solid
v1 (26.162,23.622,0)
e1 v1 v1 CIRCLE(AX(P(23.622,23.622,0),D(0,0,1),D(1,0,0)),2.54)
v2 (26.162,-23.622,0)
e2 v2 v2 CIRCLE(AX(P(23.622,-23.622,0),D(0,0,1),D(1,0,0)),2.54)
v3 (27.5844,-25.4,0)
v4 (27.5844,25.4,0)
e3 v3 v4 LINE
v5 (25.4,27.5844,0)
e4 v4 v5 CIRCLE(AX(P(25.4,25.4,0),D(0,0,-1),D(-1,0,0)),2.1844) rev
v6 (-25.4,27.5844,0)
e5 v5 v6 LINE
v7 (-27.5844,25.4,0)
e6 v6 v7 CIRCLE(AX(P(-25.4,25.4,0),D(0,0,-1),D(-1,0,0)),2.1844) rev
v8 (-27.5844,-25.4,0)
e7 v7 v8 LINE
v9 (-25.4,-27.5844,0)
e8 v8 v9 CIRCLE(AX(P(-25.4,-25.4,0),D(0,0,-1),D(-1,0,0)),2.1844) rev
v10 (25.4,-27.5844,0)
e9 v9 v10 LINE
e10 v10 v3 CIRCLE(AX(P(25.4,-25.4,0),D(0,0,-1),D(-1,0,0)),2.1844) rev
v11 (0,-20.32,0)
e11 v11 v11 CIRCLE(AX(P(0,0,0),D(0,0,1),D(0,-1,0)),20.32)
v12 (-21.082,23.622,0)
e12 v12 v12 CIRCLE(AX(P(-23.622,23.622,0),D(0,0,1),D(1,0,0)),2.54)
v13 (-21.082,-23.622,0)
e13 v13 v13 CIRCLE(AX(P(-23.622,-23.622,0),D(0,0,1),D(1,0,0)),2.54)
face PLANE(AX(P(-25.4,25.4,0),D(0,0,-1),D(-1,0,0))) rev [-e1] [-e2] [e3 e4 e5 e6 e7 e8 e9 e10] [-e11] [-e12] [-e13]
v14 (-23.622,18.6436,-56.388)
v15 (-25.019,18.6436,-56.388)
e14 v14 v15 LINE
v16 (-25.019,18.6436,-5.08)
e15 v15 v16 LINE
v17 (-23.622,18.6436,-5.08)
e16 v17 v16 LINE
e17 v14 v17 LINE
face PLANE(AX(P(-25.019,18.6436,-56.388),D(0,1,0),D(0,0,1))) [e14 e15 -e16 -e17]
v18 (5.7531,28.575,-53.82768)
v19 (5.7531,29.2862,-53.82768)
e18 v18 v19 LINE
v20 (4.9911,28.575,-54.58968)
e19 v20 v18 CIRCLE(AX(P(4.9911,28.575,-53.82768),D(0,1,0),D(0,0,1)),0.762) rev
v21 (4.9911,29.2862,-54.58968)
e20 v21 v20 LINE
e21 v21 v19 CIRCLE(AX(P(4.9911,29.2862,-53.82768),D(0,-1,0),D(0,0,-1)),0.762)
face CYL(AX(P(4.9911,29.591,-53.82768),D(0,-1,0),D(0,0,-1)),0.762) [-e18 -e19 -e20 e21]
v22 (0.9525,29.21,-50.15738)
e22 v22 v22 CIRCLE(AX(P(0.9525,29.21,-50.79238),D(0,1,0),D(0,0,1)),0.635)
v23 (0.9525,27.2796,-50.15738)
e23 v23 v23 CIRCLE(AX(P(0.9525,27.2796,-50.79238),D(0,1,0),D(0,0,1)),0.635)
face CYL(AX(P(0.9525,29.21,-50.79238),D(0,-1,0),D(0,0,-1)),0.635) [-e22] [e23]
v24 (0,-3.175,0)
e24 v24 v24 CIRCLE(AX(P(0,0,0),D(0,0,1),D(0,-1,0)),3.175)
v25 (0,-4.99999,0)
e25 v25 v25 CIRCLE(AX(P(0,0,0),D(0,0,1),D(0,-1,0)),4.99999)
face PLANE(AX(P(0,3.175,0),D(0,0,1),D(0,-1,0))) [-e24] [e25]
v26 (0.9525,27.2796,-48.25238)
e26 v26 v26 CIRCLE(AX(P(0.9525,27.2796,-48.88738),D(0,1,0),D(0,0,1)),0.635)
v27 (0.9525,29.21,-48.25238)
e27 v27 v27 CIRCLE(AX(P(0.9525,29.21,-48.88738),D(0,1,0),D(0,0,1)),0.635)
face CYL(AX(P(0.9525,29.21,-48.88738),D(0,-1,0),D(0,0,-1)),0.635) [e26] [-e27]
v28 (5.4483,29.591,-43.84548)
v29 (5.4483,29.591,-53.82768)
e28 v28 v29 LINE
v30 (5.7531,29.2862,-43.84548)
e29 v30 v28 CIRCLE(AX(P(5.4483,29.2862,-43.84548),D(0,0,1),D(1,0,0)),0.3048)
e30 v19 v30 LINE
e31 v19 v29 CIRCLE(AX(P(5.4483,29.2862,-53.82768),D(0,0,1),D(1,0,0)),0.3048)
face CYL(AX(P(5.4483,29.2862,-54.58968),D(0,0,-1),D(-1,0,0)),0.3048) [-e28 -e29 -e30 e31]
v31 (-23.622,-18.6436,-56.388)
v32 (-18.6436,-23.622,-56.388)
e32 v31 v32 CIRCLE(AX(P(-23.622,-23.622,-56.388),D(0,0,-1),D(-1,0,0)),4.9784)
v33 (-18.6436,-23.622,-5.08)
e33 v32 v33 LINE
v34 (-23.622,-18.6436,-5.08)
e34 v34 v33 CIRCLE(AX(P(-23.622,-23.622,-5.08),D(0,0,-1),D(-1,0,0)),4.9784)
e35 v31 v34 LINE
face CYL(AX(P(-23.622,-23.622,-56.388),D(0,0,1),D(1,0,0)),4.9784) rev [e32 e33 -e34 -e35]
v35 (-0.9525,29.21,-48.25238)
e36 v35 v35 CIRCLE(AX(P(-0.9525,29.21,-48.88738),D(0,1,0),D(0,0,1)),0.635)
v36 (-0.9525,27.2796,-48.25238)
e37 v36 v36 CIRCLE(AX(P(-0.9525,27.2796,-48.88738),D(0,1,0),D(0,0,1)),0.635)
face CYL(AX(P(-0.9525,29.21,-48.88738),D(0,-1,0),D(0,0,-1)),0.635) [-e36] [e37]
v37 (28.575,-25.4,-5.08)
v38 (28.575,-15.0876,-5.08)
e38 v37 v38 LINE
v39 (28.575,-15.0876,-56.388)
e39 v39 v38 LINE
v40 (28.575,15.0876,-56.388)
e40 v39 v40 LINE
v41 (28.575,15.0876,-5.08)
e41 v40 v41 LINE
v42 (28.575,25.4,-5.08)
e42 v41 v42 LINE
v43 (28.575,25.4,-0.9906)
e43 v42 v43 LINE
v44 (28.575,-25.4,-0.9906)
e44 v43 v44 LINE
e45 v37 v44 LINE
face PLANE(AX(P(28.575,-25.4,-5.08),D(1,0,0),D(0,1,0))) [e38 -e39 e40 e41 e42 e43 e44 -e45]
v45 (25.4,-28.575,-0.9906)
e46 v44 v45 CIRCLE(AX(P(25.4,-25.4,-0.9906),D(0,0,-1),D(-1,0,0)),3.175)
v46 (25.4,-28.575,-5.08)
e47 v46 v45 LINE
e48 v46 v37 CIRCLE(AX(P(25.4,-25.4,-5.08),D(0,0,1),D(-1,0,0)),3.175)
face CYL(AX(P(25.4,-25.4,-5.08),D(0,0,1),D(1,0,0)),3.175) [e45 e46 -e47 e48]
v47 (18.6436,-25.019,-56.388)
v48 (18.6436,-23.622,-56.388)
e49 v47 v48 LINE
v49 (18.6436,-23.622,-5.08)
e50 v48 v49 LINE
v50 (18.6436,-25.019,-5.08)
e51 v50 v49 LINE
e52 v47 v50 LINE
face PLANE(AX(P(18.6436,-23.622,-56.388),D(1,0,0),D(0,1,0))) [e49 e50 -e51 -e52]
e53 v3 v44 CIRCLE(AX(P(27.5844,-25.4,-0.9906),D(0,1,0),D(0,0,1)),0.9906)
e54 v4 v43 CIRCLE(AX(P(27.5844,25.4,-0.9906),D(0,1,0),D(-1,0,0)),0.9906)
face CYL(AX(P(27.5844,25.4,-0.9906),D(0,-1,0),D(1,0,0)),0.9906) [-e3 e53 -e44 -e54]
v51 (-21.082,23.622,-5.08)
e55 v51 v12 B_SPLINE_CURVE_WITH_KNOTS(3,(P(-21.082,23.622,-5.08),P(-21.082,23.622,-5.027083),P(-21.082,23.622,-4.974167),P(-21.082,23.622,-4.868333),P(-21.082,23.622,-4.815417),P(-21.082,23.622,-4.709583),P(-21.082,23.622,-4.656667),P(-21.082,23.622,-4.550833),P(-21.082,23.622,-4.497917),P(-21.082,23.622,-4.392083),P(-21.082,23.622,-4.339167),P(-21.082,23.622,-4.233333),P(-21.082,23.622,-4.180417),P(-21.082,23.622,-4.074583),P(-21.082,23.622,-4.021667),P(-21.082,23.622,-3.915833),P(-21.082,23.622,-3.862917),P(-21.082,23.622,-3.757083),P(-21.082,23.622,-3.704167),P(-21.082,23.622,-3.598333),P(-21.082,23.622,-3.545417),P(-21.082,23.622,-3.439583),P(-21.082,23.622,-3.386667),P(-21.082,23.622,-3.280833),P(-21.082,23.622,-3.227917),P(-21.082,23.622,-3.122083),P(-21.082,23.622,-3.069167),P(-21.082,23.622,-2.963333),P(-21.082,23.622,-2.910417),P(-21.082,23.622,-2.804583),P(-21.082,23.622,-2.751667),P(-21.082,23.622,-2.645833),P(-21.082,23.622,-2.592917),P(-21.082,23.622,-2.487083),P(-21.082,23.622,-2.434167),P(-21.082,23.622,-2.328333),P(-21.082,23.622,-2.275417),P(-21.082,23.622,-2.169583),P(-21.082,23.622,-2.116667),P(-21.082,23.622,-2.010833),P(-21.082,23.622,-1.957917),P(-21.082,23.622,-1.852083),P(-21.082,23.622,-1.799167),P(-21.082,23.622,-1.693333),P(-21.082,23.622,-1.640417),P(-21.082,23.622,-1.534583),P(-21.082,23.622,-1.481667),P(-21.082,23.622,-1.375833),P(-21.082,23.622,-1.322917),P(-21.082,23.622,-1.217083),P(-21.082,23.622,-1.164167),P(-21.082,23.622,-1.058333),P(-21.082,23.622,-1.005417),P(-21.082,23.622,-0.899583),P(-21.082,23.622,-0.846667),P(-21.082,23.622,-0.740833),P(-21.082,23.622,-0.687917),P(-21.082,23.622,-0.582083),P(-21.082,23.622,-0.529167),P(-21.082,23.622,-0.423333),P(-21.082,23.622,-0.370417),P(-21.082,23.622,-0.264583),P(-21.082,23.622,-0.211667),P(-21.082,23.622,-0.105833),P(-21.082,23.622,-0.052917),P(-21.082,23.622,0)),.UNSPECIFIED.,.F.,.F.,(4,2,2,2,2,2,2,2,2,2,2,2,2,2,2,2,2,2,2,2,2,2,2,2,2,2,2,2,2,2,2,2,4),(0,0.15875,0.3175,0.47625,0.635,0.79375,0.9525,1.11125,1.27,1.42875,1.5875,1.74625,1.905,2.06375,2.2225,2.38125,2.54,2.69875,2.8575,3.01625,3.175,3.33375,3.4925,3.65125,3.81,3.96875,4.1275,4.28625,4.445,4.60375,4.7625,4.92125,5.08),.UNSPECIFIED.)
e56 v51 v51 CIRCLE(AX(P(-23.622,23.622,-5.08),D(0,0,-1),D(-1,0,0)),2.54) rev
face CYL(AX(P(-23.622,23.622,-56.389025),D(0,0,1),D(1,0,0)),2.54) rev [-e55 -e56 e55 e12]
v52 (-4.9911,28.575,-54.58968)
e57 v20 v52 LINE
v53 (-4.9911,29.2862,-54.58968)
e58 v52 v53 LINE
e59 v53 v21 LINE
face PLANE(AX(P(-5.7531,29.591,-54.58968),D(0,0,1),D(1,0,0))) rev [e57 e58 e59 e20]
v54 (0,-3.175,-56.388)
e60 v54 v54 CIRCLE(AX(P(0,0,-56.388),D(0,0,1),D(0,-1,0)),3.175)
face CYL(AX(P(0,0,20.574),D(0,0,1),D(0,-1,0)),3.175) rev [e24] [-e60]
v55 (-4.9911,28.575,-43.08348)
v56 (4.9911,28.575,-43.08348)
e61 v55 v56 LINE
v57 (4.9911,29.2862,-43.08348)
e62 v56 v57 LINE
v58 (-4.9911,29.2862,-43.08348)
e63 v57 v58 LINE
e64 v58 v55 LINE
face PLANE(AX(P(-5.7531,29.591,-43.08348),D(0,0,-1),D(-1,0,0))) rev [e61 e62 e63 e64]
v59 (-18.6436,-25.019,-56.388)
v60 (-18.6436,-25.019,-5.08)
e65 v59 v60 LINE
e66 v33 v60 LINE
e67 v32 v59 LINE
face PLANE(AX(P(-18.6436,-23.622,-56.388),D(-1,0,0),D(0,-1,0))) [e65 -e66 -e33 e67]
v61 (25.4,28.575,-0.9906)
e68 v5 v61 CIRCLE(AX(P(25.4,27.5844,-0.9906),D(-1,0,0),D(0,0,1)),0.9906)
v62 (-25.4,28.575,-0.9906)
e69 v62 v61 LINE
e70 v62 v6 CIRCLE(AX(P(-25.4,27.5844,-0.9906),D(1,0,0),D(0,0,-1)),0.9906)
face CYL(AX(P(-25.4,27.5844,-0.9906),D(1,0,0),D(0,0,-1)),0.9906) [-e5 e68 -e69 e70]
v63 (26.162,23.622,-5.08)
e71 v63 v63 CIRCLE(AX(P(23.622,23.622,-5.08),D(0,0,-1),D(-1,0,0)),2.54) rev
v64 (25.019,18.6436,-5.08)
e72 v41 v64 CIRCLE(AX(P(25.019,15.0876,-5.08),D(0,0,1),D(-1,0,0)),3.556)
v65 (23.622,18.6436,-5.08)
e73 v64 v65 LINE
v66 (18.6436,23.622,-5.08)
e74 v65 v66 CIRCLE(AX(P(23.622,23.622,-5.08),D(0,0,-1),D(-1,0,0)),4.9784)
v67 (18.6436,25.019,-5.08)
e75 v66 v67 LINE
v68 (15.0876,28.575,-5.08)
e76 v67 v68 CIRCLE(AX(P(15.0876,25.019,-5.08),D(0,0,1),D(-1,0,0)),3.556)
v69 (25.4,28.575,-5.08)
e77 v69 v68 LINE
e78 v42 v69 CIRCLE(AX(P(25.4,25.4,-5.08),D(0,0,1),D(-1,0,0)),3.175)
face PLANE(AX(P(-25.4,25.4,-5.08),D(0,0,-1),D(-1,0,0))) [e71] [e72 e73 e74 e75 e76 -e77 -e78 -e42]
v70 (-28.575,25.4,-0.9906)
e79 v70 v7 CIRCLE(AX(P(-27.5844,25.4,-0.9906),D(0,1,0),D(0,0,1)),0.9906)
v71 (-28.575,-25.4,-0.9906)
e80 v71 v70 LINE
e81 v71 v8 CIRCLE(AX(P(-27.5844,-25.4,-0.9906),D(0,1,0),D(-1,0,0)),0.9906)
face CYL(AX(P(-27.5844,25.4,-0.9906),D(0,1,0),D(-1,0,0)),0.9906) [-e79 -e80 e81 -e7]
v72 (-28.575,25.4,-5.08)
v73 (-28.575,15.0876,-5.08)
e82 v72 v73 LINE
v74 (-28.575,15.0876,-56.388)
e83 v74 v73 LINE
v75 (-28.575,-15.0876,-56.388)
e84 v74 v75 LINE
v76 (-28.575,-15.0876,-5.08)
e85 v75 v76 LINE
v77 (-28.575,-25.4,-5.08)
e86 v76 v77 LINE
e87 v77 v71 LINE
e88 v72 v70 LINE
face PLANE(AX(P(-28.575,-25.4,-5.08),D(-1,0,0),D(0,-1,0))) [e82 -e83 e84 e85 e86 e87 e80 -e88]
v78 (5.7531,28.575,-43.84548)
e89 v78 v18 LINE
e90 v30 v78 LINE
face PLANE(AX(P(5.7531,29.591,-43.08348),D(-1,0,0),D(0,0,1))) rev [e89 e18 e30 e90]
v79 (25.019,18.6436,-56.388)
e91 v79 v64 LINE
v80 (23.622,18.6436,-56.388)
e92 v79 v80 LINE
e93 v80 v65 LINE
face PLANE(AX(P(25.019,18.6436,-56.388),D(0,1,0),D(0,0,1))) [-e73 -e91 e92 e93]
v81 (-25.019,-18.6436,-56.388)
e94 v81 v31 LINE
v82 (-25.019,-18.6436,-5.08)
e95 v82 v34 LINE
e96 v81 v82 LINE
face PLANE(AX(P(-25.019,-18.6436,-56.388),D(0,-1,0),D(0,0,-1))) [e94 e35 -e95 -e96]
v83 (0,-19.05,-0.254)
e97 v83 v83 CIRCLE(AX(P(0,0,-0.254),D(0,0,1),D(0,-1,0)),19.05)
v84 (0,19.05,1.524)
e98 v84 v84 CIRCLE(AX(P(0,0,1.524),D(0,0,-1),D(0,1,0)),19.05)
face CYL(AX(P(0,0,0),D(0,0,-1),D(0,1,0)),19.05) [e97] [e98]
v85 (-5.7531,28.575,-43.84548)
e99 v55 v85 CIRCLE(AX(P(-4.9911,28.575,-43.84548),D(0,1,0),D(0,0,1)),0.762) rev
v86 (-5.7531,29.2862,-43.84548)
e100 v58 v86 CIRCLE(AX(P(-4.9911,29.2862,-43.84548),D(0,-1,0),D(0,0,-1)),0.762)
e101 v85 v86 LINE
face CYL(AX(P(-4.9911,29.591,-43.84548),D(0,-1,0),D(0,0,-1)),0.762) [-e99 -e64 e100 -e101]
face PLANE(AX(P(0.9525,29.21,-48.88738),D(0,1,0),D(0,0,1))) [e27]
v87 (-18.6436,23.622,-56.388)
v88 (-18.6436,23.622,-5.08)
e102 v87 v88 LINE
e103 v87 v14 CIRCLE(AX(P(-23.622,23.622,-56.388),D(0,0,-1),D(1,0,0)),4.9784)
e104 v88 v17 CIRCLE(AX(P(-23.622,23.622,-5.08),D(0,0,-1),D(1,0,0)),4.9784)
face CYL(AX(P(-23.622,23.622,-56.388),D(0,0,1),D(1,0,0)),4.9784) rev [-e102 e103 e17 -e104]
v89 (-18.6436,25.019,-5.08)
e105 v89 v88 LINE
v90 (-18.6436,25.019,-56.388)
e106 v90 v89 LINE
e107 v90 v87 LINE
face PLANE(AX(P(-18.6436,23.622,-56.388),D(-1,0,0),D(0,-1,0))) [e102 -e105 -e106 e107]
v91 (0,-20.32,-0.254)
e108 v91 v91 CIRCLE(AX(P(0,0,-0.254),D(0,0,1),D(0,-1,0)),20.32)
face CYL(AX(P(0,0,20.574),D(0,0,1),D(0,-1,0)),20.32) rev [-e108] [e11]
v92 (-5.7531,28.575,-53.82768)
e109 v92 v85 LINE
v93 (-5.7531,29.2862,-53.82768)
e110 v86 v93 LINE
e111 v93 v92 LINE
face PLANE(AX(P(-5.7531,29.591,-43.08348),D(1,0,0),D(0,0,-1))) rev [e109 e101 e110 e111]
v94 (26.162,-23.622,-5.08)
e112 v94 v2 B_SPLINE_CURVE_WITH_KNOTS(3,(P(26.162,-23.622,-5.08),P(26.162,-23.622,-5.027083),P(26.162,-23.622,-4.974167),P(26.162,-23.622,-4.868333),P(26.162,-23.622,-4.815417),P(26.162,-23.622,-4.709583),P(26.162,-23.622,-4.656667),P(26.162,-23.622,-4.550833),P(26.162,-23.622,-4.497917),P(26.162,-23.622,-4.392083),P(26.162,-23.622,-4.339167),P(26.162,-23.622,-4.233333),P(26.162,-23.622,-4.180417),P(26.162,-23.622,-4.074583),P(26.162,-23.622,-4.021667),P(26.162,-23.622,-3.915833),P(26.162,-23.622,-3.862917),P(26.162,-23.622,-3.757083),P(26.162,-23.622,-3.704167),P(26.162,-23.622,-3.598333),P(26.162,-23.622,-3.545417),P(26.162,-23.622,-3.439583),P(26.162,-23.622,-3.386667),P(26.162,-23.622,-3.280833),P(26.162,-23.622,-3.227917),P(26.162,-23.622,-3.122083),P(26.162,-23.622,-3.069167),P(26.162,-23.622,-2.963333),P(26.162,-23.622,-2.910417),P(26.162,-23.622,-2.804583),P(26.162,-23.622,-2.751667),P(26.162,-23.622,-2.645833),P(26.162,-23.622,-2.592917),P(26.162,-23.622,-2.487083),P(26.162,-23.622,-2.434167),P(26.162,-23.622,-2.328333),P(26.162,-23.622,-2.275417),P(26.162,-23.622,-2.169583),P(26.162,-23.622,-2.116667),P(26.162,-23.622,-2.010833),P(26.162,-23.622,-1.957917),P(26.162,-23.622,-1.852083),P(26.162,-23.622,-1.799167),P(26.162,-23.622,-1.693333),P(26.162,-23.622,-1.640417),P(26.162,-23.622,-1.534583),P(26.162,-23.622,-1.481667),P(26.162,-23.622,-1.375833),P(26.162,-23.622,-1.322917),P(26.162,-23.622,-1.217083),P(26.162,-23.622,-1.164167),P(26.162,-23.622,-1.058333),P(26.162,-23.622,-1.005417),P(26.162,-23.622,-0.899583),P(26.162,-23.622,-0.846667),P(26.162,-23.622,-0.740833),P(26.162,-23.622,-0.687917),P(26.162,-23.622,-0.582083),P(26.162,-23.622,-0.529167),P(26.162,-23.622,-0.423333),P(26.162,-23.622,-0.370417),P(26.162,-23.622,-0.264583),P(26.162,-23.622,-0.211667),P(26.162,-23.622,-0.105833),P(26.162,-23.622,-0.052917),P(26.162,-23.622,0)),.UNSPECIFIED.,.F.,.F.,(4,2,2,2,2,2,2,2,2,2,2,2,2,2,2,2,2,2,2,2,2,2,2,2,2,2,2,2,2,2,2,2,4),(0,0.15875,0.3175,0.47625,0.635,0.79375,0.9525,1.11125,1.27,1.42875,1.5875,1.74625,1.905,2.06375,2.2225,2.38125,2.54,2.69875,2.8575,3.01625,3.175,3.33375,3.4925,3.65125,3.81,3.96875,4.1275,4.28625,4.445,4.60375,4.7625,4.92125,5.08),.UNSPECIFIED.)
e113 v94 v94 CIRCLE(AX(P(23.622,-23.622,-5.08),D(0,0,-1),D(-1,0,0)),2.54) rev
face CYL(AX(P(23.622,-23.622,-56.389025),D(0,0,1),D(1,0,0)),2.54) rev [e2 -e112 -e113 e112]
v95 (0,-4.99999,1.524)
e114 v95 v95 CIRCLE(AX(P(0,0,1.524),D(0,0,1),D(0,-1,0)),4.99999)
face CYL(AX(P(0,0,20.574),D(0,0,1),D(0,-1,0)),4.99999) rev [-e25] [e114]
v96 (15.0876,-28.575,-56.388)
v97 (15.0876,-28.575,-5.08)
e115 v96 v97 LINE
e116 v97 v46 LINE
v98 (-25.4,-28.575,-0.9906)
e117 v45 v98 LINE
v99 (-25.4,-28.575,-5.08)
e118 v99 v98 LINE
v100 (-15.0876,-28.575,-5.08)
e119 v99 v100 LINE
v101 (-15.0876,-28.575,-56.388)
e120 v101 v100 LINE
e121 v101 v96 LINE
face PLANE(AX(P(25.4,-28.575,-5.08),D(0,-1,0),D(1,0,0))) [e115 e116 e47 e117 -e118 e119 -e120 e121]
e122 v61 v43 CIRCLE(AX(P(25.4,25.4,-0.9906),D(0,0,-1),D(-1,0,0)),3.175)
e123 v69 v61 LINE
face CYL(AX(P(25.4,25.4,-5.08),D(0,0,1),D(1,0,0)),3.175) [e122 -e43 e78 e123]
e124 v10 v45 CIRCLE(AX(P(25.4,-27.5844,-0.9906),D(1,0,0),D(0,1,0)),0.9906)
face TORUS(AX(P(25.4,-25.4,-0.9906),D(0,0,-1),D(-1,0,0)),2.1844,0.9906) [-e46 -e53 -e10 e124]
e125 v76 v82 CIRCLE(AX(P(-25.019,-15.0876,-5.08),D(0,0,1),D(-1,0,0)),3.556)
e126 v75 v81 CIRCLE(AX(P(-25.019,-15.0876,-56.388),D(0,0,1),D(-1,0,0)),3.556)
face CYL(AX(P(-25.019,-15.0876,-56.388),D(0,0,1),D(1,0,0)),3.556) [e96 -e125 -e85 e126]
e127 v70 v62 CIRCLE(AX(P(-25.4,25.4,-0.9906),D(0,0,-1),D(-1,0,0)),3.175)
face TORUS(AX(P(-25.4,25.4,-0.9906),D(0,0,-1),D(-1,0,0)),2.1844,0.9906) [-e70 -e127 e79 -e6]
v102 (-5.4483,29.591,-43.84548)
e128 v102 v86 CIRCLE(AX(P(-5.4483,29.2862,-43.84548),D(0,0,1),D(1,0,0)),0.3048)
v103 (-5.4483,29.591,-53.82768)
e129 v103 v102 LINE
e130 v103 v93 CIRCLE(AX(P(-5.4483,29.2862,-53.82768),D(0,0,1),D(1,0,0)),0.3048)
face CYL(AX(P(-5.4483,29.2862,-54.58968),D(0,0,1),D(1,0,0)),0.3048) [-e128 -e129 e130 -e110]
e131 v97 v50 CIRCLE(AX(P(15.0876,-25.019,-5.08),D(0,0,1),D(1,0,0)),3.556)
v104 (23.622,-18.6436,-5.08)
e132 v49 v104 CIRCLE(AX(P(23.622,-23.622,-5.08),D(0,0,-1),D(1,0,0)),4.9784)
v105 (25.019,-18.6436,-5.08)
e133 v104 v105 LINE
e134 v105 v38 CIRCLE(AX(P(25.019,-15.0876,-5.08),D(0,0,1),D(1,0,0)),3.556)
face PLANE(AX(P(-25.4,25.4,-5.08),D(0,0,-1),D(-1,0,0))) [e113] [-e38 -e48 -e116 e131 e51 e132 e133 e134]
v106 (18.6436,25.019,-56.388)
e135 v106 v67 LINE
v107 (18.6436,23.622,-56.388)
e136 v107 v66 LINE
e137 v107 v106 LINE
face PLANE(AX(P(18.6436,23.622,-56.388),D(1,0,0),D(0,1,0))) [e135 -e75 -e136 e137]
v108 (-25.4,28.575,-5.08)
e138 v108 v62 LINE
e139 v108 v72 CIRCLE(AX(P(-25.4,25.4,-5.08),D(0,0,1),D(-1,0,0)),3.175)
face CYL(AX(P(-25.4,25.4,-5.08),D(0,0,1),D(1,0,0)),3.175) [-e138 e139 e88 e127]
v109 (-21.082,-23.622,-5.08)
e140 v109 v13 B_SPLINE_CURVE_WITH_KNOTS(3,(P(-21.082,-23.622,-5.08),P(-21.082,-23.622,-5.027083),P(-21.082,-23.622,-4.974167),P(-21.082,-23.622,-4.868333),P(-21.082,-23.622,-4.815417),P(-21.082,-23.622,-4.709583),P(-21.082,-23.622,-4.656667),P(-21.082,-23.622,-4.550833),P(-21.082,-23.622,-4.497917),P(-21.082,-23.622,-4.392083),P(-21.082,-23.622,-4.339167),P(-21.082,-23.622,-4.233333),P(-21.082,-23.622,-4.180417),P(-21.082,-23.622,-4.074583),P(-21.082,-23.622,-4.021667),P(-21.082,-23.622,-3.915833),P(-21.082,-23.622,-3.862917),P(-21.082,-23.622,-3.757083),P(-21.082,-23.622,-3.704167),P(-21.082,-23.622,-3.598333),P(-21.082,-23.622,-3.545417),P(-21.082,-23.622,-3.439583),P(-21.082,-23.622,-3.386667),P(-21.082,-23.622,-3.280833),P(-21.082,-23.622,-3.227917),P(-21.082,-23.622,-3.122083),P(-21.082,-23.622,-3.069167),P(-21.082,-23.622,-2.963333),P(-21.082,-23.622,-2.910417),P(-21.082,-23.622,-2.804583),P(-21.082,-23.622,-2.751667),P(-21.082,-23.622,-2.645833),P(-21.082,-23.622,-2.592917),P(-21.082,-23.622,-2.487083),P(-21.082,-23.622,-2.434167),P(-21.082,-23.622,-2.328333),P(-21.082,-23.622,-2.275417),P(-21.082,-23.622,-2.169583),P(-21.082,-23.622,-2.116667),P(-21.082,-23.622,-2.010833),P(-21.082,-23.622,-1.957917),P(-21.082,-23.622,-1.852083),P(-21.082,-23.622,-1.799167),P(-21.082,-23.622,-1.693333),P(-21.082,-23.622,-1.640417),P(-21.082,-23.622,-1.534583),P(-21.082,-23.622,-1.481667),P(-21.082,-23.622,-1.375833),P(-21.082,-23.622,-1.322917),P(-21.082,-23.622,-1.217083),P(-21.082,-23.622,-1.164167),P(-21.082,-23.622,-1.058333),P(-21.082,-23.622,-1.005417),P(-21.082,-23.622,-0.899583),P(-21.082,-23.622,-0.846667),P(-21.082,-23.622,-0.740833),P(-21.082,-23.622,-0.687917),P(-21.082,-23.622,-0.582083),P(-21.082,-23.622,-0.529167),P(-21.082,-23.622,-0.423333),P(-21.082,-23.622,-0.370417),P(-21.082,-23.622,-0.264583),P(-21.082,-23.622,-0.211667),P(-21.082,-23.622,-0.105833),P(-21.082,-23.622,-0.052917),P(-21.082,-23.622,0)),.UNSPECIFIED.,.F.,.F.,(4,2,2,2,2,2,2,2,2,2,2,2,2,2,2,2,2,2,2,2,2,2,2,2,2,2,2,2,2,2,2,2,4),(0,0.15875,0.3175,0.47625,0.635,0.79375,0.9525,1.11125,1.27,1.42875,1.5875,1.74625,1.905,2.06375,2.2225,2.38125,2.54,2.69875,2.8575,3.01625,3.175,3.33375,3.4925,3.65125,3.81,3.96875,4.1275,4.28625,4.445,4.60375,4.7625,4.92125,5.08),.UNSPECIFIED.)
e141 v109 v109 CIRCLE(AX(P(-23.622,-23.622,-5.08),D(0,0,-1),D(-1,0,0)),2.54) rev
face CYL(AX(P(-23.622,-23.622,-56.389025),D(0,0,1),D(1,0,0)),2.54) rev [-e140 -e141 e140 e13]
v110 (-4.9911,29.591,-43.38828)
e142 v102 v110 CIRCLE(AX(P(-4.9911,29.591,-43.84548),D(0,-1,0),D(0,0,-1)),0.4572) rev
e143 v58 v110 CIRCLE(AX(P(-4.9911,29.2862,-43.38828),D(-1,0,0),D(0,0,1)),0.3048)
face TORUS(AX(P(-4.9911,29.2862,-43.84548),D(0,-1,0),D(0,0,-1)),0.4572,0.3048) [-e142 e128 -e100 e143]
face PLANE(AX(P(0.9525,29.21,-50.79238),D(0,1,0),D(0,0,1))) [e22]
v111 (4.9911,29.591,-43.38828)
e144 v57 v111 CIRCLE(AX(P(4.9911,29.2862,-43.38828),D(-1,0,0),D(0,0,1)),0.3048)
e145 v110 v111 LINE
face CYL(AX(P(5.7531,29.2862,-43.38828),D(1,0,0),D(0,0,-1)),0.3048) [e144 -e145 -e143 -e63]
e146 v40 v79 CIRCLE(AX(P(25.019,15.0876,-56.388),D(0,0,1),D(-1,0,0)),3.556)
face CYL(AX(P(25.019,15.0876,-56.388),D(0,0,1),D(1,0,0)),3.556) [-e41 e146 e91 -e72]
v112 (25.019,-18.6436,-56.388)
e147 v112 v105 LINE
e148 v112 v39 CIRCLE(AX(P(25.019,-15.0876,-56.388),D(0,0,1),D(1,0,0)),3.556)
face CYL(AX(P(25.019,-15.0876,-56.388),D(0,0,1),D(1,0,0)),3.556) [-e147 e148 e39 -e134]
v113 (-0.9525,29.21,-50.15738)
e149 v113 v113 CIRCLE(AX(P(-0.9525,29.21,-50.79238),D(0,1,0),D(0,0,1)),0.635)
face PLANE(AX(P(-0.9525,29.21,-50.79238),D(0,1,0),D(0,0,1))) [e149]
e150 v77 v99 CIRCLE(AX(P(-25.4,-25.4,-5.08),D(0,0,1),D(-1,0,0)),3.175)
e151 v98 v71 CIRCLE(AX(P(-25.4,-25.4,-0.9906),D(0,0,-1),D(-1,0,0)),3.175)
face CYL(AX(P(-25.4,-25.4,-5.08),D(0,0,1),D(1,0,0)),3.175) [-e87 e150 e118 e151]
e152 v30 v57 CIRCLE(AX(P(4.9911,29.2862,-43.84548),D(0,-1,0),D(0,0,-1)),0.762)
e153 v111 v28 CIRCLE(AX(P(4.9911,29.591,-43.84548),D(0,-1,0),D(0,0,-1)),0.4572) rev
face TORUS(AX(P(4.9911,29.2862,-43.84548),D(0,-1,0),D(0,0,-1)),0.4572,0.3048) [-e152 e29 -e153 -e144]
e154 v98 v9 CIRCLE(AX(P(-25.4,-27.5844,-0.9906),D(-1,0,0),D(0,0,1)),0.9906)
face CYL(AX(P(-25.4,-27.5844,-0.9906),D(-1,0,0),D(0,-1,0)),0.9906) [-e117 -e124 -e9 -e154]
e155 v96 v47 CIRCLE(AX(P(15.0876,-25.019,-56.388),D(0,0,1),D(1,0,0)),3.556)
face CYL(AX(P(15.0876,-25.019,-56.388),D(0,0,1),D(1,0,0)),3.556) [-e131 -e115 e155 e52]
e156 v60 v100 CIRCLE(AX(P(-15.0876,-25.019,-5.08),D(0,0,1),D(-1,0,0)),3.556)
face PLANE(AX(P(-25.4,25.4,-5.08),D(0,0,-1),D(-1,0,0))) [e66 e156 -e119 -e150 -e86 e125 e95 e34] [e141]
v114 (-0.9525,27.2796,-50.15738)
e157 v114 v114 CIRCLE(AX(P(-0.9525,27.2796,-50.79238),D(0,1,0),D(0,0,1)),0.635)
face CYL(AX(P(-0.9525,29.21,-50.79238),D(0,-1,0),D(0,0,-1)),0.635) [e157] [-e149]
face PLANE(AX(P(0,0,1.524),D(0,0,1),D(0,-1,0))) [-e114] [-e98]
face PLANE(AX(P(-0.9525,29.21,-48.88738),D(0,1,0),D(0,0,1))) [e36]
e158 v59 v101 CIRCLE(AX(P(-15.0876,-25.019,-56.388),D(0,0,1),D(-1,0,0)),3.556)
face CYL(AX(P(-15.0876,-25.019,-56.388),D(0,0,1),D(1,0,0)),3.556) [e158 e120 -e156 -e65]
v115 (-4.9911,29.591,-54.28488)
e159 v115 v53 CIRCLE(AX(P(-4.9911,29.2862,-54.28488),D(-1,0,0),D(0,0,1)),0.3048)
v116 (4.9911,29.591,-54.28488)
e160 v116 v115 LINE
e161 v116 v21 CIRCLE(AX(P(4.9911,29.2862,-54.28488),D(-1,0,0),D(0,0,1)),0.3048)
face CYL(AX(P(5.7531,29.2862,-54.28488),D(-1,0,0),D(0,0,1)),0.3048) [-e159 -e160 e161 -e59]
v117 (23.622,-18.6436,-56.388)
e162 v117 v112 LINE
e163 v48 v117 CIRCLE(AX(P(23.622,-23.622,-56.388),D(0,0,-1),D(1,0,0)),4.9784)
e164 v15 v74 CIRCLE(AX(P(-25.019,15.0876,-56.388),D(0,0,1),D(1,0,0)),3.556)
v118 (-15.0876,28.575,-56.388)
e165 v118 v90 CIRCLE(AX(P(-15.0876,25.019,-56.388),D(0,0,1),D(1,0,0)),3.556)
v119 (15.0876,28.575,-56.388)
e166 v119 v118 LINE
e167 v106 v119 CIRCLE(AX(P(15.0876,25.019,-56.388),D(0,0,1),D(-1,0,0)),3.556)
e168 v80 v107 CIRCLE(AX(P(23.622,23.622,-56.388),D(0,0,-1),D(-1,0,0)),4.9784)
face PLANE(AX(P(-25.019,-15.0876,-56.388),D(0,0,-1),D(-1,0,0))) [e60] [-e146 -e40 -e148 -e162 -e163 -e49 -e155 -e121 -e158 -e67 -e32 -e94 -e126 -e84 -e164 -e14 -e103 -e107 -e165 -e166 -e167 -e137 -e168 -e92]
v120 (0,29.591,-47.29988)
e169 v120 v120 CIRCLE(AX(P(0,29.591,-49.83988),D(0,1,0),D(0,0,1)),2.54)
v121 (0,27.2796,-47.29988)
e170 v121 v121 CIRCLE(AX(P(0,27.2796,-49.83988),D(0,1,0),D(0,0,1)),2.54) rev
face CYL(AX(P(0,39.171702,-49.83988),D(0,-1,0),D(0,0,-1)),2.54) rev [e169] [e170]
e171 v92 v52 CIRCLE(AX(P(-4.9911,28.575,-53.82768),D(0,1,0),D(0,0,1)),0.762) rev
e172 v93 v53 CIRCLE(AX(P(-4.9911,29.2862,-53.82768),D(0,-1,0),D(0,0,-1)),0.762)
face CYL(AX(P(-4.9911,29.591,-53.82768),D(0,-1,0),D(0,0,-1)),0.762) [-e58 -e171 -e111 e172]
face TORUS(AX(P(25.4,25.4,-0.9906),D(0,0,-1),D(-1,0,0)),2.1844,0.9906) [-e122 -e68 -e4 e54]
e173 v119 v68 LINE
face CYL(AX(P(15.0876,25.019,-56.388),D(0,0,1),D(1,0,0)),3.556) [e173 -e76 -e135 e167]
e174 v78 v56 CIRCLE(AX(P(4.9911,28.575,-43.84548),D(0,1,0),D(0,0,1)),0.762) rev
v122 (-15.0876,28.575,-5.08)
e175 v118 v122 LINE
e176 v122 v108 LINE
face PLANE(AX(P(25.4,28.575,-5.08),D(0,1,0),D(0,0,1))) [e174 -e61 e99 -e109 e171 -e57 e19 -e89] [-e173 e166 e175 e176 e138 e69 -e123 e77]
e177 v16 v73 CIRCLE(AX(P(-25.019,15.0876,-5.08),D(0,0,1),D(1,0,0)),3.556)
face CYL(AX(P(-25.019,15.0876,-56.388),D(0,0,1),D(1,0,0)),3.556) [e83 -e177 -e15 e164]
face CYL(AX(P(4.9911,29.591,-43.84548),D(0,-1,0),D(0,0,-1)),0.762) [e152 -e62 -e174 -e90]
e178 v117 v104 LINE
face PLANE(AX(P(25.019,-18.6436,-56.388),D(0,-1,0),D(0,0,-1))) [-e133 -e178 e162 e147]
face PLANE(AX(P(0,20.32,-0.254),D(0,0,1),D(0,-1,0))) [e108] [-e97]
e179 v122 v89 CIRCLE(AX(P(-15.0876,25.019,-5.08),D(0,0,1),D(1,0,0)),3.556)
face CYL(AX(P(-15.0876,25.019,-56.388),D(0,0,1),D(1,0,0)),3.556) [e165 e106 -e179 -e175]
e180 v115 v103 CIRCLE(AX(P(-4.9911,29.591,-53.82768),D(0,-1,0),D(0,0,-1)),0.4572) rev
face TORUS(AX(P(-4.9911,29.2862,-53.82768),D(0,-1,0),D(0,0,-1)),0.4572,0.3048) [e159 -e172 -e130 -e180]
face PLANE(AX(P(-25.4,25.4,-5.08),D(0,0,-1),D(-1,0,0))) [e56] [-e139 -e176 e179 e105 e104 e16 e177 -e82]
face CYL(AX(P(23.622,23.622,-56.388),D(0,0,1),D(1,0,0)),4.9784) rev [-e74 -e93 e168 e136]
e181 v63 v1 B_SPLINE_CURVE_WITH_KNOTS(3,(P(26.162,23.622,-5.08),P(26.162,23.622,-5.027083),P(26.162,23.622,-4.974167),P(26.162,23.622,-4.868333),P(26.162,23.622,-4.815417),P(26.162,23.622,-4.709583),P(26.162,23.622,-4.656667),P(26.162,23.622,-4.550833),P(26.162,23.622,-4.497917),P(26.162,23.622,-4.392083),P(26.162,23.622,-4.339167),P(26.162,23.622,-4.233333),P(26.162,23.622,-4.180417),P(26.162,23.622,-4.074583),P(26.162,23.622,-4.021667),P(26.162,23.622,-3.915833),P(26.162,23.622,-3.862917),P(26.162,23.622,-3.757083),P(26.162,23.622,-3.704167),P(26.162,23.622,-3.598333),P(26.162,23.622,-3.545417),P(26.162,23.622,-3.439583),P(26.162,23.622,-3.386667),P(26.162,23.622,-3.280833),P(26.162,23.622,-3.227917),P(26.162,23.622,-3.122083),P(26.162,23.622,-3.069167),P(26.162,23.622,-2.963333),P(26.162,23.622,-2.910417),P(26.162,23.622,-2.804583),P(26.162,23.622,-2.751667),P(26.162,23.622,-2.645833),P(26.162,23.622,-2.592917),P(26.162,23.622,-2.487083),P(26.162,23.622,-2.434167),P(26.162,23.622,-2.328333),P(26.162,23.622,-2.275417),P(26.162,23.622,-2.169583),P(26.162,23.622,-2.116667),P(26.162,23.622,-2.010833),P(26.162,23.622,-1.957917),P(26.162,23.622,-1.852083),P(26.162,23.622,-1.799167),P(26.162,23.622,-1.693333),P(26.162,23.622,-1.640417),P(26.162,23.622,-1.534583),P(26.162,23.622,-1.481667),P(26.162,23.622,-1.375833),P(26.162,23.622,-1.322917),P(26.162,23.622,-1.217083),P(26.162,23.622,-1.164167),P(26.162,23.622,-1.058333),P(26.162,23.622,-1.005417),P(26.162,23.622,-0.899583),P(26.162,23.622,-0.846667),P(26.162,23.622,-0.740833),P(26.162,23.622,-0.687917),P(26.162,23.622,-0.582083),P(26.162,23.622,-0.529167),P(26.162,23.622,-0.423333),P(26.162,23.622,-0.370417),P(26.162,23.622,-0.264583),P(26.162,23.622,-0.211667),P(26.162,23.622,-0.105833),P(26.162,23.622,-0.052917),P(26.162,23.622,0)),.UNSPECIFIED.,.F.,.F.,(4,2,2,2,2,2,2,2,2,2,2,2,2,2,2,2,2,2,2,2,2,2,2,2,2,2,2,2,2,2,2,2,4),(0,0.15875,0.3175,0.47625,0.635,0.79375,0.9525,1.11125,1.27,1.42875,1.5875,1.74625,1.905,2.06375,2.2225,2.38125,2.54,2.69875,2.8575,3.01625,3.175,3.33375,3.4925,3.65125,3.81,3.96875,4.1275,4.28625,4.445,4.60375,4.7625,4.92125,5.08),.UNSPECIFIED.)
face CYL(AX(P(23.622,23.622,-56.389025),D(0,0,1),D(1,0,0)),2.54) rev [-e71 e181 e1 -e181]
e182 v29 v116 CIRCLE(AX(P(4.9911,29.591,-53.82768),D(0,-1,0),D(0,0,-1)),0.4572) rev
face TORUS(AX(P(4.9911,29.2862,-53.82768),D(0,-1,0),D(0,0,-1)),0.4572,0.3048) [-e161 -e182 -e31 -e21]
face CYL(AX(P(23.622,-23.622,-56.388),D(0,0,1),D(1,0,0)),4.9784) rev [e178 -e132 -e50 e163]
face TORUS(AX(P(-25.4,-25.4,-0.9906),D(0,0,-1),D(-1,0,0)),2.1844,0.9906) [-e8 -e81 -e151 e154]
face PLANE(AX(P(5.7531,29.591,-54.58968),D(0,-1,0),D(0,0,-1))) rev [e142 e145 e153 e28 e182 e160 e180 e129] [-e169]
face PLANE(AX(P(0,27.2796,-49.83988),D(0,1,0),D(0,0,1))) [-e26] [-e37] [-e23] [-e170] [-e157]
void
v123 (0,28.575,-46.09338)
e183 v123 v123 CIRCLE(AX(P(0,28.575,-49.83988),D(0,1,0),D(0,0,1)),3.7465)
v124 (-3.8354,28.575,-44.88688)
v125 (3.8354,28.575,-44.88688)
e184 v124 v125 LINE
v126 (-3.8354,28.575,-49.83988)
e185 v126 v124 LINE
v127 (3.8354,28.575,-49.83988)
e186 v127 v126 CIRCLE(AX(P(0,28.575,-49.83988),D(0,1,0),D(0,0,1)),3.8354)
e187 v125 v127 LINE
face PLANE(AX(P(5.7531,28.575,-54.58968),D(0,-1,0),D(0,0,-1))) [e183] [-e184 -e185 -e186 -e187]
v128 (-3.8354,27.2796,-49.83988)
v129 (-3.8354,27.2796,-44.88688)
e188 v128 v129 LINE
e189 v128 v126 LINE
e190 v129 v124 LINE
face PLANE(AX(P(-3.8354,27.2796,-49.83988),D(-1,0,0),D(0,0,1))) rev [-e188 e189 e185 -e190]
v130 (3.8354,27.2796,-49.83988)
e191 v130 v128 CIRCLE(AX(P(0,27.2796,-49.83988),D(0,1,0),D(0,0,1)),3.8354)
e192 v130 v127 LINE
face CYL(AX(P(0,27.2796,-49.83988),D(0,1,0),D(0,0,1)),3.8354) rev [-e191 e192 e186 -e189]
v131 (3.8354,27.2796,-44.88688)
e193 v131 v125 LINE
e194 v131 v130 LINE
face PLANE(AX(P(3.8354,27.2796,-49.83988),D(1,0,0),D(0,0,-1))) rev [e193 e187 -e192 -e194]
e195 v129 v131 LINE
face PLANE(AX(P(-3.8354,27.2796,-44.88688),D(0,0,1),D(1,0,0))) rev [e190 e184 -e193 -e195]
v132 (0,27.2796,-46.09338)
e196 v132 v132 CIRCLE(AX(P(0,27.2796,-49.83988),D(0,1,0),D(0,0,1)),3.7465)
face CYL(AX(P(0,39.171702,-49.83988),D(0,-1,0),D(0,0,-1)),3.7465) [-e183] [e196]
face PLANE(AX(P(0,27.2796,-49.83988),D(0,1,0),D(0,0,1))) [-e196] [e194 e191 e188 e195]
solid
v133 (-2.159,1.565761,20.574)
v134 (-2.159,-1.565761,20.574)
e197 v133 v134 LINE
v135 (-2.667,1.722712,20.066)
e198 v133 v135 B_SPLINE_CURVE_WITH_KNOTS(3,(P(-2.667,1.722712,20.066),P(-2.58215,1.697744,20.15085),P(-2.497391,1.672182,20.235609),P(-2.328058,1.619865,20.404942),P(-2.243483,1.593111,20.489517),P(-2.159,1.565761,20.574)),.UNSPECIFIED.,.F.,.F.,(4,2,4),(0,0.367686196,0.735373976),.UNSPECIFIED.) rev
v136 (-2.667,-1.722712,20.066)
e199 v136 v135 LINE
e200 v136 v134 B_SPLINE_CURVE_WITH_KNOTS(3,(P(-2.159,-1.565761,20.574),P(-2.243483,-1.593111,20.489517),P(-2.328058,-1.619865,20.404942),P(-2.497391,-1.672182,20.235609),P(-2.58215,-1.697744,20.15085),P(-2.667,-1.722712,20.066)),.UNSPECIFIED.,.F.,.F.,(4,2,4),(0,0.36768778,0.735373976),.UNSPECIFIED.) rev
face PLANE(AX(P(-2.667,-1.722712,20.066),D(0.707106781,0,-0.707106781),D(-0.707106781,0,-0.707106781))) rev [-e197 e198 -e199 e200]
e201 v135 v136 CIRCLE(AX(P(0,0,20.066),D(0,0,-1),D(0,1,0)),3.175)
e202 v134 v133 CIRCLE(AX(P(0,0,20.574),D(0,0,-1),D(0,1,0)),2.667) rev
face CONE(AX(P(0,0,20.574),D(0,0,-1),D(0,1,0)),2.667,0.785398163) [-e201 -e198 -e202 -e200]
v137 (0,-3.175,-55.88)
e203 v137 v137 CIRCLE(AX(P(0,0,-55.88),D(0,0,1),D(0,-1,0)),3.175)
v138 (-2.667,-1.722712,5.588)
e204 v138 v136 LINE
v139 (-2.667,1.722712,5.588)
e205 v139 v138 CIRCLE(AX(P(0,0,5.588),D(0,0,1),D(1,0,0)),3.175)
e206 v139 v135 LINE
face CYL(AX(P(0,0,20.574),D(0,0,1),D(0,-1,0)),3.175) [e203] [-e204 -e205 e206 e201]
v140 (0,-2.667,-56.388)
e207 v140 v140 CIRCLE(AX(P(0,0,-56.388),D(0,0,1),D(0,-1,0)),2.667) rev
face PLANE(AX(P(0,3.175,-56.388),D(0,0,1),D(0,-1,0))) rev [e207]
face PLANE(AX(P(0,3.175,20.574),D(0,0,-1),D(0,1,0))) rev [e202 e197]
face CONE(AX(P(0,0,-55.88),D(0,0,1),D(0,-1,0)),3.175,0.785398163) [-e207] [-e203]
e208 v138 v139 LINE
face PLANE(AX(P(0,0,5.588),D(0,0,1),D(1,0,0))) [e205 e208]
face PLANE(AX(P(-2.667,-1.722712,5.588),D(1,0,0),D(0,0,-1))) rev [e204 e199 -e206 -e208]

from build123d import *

# Parameters (mm, degrees)
BOSS_EXTRUDE1_DEPTH = 5.08
FILLET1_R           = 0.9906
BOSS_EXTRUDE2_DEPTH = 51.308
SKETCH5_W           = 1.524
SKETCH5_H           = 19.05
SKETCH6_W           = 0.254
SKETCH6_H           = 1.27
SKETCH7_W           = 76.962
SKETCH7_H           = 3.175
CUT_EXTRUDE1_START  = -14.986
CUT_EXTRUDE1_DEPTH  = 14.986
CHAMFER1_SIZE       = 0.508
SKETCH9_R           = 2.54
CUT_EXTRUDE2_DEPTH  = 5.08
CUT_EXTRUDE3_DEPTH  = 1.2954
SKETCH11_R          = 3.7465
SKETCH11_R_2        = 2.54
BOSS_EXTRUDE3_DEPTH = 1.2954
SKETCH12_W          = 11.5062
SKETCH12_H          = 11.5062
SKETCH12_R          = 2.54
BOSS_EXTRUDE4_DEPTH = 1.016
FILLET2_R           = 0.762
FILLET3_R           = 0.3048
SKETCH13_R          = 0.635
BOSS_EXTRUDE5_DEPTH = 1.9304


with BuildPart() as part:
    # Sketch3 → Boss-Extrude1 (new body)
    with BuildSketch(Plane.XY):
        with BuildLine():
            Line((-28.575, -25.4), (-28.575, 25.4))
            ThreePointArc((-28.575, 25.4), (-27.64506403, 27.64506403), (-25.4, 28.575))
            Line((-25.4, 28.575), (25.4, 28.575))
            ThreePointArc((25.4, 28.575), (27.64506403, 27.64506403), (28.575, 25.4))
            Line((28.575, 25.4), (28.575, -25.4))
            ThreePointArc((28.575, -25.4), (27.64506403, -27.64506403), (25.4, -28.575))
            Line((25.4, -28.575), (-25.4, -28.575))
            ThreePointArc((-25.4, -28.575), (-27.64506403, -27.64506403), (-28.575, -25.4))
        make_face()
    extrude(amount=-BOSS_EXTRUDE1_DEPTH)

    # Fillet1
    fillet1_edges = [part.edges().sort_by_distance(p)[0] for p in [
        (-28.575, 0, 0),
        (-27.64506403, 27.64506403, 0),
        (0, 28.575, 0),
        (27.64506403, 27.64506403, 0),
        (28.575, 0, 0),
        (27.64506403, -27.64506403, 0),
        (0, -28.575, 0),
        (-27.64506403, -27.64506403, 0),
    ]]
    fillet(fillet1_edges, radius=FILLET1_R)

    # Sketch4 → Boss-Extrude2 (add)
    with BuildSketch(Plane.XY.offset(-5.08)):
        with BuildLine():
            Line((-25.019, 18.6436), (-23.622, 18.6436))
            ThreePointArc((-23.622, 18.6436), (-20.101739601, 20.101739601), (-18.6436, 23.622))
            Line((-18.6436, 23.622), (-18.6436, 25.019))
            ThreePointArc((-18.6436, 25.019), (-17.602071714, 27.533471714), (-15.0876, 28.575))
            Line((-15.0876, 28.575), (15.0876, 28.575))
            ThreePointArc((15.0876, 28.575), (17.602071714, 27.533471714), (18.6436, 25.019))
            Line((18.6436, 25.019), (18.6436, 23.622))
            ThreePointArc((18.6436, 23.622), (20.101739601, 20.101739601), (23.622, 18.6436))
            Line((23.622, 18.6436), (25.019, 18.6436))
            ThreePointArc((25.019, 18.6436), (27.533471714, 17.602071714), (28.575, 15.0876))
            Line((28.575, 15.0876), (28.575, -15.0876))
            ThreePointArc((28.575, -15.0876), (27.533471714, -17.602071714), (25.019, -18.6436))
            Line((25.019, -18.6436), (23.622, -18.6436))
            ThreePointArc((23.622, -18.6436), (20.101739601, -20.101739601), (18.6436, -23.622))
            Line((18.6436, -23.622), (18.6436, -25.019))
            ThreePointArc((18.6436, -25.019), (17.602071714, -27.533471714), (15.0876, -28.575))
            Line((15.0876, -28.575), (-15.0876, -28.575))
            ThreePointArc((-15.0876, -28.575), (-17.602071714, -27.533471714), (-18.6436, -25.019))
            Line((-18.6436, -25.019), (-18.6436, -23.622))
            ThreePointArc((-18.6436, -23.622), (-20.101739601, -20.101739601), (-23.622, -18.6436))
            Line((-23.622, -18.6436), (-25.019, -18.6436))
            ThreePointArc((-25.019, -18.6436), (-27.533471714, -17.602071714), (-28.575, -15.0876))
            Line((-28.575, -15.0876), (-28.575, 15.0876))
            ThreePointArc((-28.575, 15.0876), (-27.533471714, 17.602071714), (-25.019, 18.6436))
        make_face()
    extrude(amount=-BOSS_EXTRUDE2_DEPTH)

    # Sketch5 → Revolve1 (revolve)
    with BuildSketch(Plane(origin=(0, 0, 0), x_dir=(0, 0, -1), z_dir=(1, 0, 0))):
        with Locations((-0.762, 9.525)):
            Rectangle(SKETCH5_W, SKETCH5_H)
    revolve(axis=Axis((0, 0, 0), (0, 0, 1)))

    # Sketch6 → Cut-Revolve1 (revolve, cut)
    with BuildSketch(Plane(origin=(0, 0, 0), x_dir=(0, 0, -1), z_dir=(1, 0, 0)), mode=Mode.PRIVATE) as cut_revolve1_sk:
        Polygon((56.388, 0), (-1.524, 0), (-1.524, 4.99999), (0, 4.99999), (0, 3.175), (56.388, 3.175), align=None)
        with Locations((0.127, 19.685)):
            Rectangle(SKETCH6_W, SKETCH6_H)
    revolve(cut_revolve1_sk.sketch.rotate(Axis((0, 0, 20.574), (0, 0, -1)), 180), axis=Axis((0, 0, 20.574), (0, 0, -1)), mode=Mode.SUBTRACT)

    # Sketch9 → Cut-Extrude2 (cut)
    with BuildSketch(Plane.XY):
        with Locations((23.622, -23.622)):
            Circle(SKETCH9_R)
        with Locations((-23.622, -23.622)):
            Circle(SKETCH9_R)
        with Locations((-23.622, 23.622)):
            Circle(SKETCH9_R)
        with Locations((23.622, 23.622)):
            Circle(SKETCH9_R)
    extrude(amount=-CUT_EXTRUDE2_DEPTH, mode=Mode.SUBTRACT)

    # Sketch10 → Cut-Extrude3 (cut)
    with BuildSketch(Plane(origin=(0, 28.575, -0.751200197), x_dir=(1, 0, 0), z_dir=(0, 1, 0))):
        with BuildLine():
            Line((-3.8354, 49.088679803), (-3.8354, 44.135679803))
            Line((-3.8354, 44.135679803), (3.8354, 44.135679803))
            Line((3.8354, 44.135679803), (3.8354, 49.088679803))
            ThreePointArc((3.8354, 49.088679803), (0, 52.924079803), (-3.8354, 49.088679803))
        make_face()
    extrude(amount=-CUT_EXTRUDE3_DEPTH, mode=Mode.SUBTRACT)

    # Sketch11 → Boss-Extrude3 (add)
    with BuildSketch(Plane(origin=(0, 27.2796, 0), x_dir=(1, 0, 0), z_dir=(0, 1, 0))):
        with Locations(Location((0, 49.83988, 0), (0, 0, 270))):
            Circle(SKETCH11_R)
        with Locations(Location((0, 49.83988, 0), (0, 0, 270))):
            Circle(SKETCH11_R_2, mode=Mode.SUBTRACT)
    extrude(amount=BOSS_EXTRUDE3_DEPTH)

    # Sketch12 → Boss-Extrude4 (add)
    with BuildSketch(Plane(origin=(0, 28.575, 0), x_dir=(1, 0, 0), z_dir=(0, 1, 0))):
        with Locations((0, 48.83658)):
            Rectangle(SKETCH12_W, SKETCH12_H)
        with Locations(Location((0, 49.83988, 0), (0, 0, 270))):
            Circle(SKETCH12_R, mode=Mode.SUBTRACT)
    extrude(amount=BOSS_EXTRUDE4_DEPTH)

    # Fillet2
    fillet2_edges = [part.edges().sort_by_distance(p)[0] for p in [
        (5.7531, 29.083, -43.08348),
        (5.7531, 29.083, -54.58968),
        (-5.7531, 29.083, -54.58968),
        (-5.7531, 29.083, -43.08348),
    ]]
    fillet(fillet2_edges, radius=FILLET2_R)

    # Fillet3
    fillet3_edges = [part.edges().sort_by_distance(p)[0] for p in [
        (0, 29.591, -54.58968),
        (5.7531, 29.591, -48.83658),
        (-5.7531, 29.591, -48.83658),
        (0, 29.591, -43.08348),
        (-5.529915367, 29.591, -43.306664633),
        (5.529915367, 29.591, -43.306664633),
        (-5.529915367, 29.591, -54.366495367),
        (5.529915367, 29.591, -54.366495367),
    ]]
    fillet(fillet3_edges, radius=FILLET3_R)

    # Sketch13 → Boss-Extrude5 (add)
    with BuildSketch(Plane(origin=(0, 27.2796, 0), x_dir=(1, 0, 0), z_dir=(0, 1, 0))):
        with Locations(Location((-0.9525, 50.79238, 0), (0, 0, 270))):
            Circle(SKETCH13_R)
        with Locations(Location((0.9525, 50.79238, 0), (0, 0, 270))):
            Circle(SKETCH13_R)
        with Locations(Location((0.9525, 48.88738, 0), (0, 0, 270))):
            Circle(SKETCH13_R)
        with Locations(Location((-0.9525, 48.88738, 0), (0, 0, 270))):
            Circle(SKETCH13_R)
    extrude(amount=BOSS_EXTRUDE5_DEPTH)


with BuildPart() as body_2:
    # Sketch7 → Revolve2 (revolve)
    with BuildSketch(Plane(origin=(0, 0, 0), x_dir=(0, 0, -1), z_dir=(1, 0, 0)), mode=Mode.PRIVATE) as revolve2_sk:
        with Locations((17.907, 1.5875)):
            Rectangle(SKETCH7_W, SKETCH7_H)
    revolve(revolve2_sk.sketch.rotate(Axis((0, 0, 20.574), (0, 0, -1)), 180), axis=Axis((0, 0, 20.574), (0, 0, -1)))

    # Sketch8 → Cut-Extrude1 (cut)
    with BuildSketch(Plane.XY.offset(20.574).offset(CUT_EXTRUDE1_START)):
        with BuildLine():
            Line((-2.667, -1.722711816), (-2.667, 1.722711816))
            ThreePointArc((-2.667, 1.722711816), (-3.175, 0), (-2.667, -1.722711816))
        make_face()
    extrude(amount=CUT_EXTRUDE1_DEPTH, mode=Mode.SUBTRACT)

    # Chamfer1
    chamfer1_edges = [body_2.edges().sort_by_distance(p)[0] for p in [
        (-2.667, 0, 20.574),
        (0, 3.175, -56.388),
        (2.78838977, 1.51838977, 20.574),
    ]]
    chamfer(chamfer1_edges, length=CHAMFER1_SIZE - 0.0001)  # a hair under: the kernel refuses the full size


solid = Compound([part.part, body_2.part])
